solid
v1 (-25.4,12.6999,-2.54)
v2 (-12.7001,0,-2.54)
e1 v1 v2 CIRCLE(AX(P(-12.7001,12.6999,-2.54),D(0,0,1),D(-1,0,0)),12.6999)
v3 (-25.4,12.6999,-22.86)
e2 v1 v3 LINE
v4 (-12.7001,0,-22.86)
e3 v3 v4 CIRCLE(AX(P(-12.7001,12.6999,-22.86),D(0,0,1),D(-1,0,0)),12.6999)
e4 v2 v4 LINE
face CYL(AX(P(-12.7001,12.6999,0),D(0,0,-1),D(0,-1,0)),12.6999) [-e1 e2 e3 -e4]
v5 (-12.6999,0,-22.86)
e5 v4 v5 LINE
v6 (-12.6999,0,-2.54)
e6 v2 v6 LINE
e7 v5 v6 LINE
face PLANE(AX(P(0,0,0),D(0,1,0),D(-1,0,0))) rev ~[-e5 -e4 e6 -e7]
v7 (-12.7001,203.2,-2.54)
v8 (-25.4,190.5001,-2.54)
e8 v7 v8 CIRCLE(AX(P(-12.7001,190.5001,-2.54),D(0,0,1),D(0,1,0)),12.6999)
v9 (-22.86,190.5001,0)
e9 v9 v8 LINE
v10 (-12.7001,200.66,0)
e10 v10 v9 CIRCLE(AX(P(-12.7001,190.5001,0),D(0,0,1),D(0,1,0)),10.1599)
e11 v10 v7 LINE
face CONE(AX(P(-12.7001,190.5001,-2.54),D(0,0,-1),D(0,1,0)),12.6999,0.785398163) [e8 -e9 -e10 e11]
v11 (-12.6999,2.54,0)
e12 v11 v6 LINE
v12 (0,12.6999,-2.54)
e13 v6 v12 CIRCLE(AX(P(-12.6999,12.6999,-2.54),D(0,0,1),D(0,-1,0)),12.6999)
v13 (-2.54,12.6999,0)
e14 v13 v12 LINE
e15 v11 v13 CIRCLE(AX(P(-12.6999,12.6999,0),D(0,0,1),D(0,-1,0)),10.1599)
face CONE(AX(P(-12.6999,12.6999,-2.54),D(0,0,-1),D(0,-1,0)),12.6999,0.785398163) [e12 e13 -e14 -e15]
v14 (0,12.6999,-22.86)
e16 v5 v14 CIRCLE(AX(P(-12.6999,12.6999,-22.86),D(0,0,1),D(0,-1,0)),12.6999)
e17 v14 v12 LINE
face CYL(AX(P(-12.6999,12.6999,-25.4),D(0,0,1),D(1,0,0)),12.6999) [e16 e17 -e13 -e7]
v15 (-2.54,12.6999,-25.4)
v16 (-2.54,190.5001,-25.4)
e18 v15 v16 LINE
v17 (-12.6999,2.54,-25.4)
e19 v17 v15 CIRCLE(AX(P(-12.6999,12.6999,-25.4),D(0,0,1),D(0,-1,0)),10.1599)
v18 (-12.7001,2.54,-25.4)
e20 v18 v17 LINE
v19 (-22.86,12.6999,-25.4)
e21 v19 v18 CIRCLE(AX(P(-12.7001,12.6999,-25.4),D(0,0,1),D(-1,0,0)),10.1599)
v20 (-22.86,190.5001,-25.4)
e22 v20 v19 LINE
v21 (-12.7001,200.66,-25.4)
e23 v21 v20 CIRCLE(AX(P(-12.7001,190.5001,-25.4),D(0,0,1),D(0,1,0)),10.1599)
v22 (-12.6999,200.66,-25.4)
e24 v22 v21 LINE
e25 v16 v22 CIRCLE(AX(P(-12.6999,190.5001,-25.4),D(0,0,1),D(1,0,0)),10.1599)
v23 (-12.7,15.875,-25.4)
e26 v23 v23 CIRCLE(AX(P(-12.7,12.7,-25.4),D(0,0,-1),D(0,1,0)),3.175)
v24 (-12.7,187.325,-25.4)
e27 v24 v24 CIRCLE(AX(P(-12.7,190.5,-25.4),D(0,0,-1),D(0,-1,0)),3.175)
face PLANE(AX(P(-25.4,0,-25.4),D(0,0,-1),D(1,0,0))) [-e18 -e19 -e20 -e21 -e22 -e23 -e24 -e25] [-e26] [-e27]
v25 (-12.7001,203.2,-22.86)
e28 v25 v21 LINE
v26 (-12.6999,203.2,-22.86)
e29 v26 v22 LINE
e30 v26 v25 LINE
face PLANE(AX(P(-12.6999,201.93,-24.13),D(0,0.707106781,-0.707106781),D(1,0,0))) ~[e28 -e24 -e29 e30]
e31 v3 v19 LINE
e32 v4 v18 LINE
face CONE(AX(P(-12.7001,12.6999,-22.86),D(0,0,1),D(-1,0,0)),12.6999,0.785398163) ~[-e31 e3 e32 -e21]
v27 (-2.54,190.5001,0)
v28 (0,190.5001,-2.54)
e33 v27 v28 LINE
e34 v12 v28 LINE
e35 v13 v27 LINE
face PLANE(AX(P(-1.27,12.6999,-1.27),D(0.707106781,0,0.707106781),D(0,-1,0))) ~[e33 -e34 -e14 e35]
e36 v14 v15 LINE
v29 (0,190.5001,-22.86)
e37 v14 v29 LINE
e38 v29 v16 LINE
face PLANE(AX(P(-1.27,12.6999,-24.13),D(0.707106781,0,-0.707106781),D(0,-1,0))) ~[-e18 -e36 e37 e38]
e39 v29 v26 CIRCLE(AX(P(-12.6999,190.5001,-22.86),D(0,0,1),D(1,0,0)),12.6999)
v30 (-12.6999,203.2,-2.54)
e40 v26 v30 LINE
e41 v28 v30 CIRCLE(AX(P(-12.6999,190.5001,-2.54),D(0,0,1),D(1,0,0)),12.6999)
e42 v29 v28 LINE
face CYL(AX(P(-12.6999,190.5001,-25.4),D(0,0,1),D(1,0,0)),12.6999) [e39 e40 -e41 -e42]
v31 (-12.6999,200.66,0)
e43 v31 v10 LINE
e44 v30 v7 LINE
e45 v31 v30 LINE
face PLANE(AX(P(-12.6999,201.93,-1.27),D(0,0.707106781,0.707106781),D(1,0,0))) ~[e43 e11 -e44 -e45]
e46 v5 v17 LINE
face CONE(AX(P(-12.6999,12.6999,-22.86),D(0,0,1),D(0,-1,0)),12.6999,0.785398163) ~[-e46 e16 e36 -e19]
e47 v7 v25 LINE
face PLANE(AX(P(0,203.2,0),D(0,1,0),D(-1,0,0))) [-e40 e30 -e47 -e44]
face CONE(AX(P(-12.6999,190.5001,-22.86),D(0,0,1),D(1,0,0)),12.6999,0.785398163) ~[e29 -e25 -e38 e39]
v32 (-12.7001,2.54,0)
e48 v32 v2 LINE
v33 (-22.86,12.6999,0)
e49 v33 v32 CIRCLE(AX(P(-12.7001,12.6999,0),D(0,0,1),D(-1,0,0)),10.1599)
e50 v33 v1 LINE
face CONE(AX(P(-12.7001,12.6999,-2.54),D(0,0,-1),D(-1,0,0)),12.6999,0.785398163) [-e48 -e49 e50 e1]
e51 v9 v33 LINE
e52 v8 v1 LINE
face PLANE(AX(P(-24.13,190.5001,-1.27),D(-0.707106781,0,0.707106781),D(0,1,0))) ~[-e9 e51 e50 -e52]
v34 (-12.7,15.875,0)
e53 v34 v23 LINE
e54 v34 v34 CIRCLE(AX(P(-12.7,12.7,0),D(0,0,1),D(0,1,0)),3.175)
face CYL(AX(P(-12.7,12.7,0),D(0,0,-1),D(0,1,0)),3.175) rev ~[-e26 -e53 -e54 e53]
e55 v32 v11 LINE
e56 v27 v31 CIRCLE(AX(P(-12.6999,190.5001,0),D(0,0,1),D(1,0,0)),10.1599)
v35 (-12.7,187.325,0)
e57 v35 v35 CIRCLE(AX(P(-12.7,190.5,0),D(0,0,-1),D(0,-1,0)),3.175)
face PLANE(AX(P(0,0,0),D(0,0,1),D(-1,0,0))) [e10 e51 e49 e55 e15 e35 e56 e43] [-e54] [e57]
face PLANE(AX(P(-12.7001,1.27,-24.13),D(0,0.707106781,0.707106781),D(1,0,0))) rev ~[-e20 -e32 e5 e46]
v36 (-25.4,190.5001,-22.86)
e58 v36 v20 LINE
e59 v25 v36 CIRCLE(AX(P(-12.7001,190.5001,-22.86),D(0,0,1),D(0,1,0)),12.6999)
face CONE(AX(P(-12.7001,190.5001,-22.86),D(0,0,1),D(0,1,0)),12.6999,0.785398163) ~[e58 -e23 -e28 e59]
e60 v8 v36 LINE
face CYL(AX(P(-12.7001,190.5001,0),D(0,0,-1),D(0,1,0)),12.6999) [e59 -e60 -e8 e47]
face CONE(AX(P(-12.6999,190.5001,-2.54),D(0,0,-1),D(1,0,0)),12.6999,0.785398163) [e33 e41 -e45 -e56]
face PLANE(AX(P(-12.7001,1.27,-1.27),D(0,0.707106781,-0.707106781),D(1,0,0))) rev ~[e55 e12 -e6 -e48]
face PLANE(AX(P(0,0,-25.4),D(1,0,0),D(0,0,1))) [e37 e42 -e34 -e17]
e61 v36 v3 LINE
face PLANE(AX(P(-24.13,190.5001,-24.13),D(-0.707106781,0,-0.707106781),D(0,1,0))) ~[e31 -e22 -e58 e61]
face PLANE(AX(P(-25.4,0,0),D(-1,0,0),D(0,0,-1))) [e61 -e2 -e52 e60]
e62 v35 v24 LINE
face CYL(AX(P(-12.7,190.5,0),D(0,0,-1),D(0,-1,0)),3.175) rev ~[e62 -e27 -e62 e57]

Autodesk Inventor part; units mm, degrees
ref_plane "YZ Plane" through (0, 0, 0) normal (1, 0, 0) x (0, 1, 0)
ref_plane "XZ Plane" through (0, 0, 0) normal (0, 1, 0) x (-1, 0, 0)
sketch "Sketch1" plane through (0, 0, 0) normal (0, 1, 0) x (-1, 0, 0)
  line L0 (0, 0) -> (25.4, 0)
  line L1 (25.4, 0) -> (25.4, -25.4)
  line L2 (25.4, -25.4) -> (0, -25.4)
  line L3 (0, -25.4) -> (0, 0)
  dimension "d0" = 25.4
  dimension "d1" = 25.4
extrude "Extrusion1" add sketch "Sketch1" along normal blind 203.2
hole "Hole1" at (-12.7, 190.5, 0) direction (0, 0, -1) diameter 6.35 end through all
ref_plane "Work Plane1" through (0, 101.6, 0) normal (0, 1, 0) x (1, 0, 0)
mirror "Mirror1" about plane through (0, 101.6, 0) normal (0, 1, 0) of "Hole1"
fillet "Fillet1" radius 12.7 4 edges at (0, 203.2, -12.7) (-25.4, 203.2, -12.7) (0, 0, -12.7) (-25.4, 0, -12.7)
chamfer "Chamfer1" distance 2.54 angle 45 8 edges at (0, 101.6, 0) (-3.7197, 199.4803, 0) (-25.4, 101.6, 0) (-3.7197, 3.7197, 0) (0, 101.6, -25.4) (-3.7197, 199.4803, -25.4) (-25.4, 101.6, -25.4) (-3.7197, 3.7197, -25.4)
properties part number "shortBar"
